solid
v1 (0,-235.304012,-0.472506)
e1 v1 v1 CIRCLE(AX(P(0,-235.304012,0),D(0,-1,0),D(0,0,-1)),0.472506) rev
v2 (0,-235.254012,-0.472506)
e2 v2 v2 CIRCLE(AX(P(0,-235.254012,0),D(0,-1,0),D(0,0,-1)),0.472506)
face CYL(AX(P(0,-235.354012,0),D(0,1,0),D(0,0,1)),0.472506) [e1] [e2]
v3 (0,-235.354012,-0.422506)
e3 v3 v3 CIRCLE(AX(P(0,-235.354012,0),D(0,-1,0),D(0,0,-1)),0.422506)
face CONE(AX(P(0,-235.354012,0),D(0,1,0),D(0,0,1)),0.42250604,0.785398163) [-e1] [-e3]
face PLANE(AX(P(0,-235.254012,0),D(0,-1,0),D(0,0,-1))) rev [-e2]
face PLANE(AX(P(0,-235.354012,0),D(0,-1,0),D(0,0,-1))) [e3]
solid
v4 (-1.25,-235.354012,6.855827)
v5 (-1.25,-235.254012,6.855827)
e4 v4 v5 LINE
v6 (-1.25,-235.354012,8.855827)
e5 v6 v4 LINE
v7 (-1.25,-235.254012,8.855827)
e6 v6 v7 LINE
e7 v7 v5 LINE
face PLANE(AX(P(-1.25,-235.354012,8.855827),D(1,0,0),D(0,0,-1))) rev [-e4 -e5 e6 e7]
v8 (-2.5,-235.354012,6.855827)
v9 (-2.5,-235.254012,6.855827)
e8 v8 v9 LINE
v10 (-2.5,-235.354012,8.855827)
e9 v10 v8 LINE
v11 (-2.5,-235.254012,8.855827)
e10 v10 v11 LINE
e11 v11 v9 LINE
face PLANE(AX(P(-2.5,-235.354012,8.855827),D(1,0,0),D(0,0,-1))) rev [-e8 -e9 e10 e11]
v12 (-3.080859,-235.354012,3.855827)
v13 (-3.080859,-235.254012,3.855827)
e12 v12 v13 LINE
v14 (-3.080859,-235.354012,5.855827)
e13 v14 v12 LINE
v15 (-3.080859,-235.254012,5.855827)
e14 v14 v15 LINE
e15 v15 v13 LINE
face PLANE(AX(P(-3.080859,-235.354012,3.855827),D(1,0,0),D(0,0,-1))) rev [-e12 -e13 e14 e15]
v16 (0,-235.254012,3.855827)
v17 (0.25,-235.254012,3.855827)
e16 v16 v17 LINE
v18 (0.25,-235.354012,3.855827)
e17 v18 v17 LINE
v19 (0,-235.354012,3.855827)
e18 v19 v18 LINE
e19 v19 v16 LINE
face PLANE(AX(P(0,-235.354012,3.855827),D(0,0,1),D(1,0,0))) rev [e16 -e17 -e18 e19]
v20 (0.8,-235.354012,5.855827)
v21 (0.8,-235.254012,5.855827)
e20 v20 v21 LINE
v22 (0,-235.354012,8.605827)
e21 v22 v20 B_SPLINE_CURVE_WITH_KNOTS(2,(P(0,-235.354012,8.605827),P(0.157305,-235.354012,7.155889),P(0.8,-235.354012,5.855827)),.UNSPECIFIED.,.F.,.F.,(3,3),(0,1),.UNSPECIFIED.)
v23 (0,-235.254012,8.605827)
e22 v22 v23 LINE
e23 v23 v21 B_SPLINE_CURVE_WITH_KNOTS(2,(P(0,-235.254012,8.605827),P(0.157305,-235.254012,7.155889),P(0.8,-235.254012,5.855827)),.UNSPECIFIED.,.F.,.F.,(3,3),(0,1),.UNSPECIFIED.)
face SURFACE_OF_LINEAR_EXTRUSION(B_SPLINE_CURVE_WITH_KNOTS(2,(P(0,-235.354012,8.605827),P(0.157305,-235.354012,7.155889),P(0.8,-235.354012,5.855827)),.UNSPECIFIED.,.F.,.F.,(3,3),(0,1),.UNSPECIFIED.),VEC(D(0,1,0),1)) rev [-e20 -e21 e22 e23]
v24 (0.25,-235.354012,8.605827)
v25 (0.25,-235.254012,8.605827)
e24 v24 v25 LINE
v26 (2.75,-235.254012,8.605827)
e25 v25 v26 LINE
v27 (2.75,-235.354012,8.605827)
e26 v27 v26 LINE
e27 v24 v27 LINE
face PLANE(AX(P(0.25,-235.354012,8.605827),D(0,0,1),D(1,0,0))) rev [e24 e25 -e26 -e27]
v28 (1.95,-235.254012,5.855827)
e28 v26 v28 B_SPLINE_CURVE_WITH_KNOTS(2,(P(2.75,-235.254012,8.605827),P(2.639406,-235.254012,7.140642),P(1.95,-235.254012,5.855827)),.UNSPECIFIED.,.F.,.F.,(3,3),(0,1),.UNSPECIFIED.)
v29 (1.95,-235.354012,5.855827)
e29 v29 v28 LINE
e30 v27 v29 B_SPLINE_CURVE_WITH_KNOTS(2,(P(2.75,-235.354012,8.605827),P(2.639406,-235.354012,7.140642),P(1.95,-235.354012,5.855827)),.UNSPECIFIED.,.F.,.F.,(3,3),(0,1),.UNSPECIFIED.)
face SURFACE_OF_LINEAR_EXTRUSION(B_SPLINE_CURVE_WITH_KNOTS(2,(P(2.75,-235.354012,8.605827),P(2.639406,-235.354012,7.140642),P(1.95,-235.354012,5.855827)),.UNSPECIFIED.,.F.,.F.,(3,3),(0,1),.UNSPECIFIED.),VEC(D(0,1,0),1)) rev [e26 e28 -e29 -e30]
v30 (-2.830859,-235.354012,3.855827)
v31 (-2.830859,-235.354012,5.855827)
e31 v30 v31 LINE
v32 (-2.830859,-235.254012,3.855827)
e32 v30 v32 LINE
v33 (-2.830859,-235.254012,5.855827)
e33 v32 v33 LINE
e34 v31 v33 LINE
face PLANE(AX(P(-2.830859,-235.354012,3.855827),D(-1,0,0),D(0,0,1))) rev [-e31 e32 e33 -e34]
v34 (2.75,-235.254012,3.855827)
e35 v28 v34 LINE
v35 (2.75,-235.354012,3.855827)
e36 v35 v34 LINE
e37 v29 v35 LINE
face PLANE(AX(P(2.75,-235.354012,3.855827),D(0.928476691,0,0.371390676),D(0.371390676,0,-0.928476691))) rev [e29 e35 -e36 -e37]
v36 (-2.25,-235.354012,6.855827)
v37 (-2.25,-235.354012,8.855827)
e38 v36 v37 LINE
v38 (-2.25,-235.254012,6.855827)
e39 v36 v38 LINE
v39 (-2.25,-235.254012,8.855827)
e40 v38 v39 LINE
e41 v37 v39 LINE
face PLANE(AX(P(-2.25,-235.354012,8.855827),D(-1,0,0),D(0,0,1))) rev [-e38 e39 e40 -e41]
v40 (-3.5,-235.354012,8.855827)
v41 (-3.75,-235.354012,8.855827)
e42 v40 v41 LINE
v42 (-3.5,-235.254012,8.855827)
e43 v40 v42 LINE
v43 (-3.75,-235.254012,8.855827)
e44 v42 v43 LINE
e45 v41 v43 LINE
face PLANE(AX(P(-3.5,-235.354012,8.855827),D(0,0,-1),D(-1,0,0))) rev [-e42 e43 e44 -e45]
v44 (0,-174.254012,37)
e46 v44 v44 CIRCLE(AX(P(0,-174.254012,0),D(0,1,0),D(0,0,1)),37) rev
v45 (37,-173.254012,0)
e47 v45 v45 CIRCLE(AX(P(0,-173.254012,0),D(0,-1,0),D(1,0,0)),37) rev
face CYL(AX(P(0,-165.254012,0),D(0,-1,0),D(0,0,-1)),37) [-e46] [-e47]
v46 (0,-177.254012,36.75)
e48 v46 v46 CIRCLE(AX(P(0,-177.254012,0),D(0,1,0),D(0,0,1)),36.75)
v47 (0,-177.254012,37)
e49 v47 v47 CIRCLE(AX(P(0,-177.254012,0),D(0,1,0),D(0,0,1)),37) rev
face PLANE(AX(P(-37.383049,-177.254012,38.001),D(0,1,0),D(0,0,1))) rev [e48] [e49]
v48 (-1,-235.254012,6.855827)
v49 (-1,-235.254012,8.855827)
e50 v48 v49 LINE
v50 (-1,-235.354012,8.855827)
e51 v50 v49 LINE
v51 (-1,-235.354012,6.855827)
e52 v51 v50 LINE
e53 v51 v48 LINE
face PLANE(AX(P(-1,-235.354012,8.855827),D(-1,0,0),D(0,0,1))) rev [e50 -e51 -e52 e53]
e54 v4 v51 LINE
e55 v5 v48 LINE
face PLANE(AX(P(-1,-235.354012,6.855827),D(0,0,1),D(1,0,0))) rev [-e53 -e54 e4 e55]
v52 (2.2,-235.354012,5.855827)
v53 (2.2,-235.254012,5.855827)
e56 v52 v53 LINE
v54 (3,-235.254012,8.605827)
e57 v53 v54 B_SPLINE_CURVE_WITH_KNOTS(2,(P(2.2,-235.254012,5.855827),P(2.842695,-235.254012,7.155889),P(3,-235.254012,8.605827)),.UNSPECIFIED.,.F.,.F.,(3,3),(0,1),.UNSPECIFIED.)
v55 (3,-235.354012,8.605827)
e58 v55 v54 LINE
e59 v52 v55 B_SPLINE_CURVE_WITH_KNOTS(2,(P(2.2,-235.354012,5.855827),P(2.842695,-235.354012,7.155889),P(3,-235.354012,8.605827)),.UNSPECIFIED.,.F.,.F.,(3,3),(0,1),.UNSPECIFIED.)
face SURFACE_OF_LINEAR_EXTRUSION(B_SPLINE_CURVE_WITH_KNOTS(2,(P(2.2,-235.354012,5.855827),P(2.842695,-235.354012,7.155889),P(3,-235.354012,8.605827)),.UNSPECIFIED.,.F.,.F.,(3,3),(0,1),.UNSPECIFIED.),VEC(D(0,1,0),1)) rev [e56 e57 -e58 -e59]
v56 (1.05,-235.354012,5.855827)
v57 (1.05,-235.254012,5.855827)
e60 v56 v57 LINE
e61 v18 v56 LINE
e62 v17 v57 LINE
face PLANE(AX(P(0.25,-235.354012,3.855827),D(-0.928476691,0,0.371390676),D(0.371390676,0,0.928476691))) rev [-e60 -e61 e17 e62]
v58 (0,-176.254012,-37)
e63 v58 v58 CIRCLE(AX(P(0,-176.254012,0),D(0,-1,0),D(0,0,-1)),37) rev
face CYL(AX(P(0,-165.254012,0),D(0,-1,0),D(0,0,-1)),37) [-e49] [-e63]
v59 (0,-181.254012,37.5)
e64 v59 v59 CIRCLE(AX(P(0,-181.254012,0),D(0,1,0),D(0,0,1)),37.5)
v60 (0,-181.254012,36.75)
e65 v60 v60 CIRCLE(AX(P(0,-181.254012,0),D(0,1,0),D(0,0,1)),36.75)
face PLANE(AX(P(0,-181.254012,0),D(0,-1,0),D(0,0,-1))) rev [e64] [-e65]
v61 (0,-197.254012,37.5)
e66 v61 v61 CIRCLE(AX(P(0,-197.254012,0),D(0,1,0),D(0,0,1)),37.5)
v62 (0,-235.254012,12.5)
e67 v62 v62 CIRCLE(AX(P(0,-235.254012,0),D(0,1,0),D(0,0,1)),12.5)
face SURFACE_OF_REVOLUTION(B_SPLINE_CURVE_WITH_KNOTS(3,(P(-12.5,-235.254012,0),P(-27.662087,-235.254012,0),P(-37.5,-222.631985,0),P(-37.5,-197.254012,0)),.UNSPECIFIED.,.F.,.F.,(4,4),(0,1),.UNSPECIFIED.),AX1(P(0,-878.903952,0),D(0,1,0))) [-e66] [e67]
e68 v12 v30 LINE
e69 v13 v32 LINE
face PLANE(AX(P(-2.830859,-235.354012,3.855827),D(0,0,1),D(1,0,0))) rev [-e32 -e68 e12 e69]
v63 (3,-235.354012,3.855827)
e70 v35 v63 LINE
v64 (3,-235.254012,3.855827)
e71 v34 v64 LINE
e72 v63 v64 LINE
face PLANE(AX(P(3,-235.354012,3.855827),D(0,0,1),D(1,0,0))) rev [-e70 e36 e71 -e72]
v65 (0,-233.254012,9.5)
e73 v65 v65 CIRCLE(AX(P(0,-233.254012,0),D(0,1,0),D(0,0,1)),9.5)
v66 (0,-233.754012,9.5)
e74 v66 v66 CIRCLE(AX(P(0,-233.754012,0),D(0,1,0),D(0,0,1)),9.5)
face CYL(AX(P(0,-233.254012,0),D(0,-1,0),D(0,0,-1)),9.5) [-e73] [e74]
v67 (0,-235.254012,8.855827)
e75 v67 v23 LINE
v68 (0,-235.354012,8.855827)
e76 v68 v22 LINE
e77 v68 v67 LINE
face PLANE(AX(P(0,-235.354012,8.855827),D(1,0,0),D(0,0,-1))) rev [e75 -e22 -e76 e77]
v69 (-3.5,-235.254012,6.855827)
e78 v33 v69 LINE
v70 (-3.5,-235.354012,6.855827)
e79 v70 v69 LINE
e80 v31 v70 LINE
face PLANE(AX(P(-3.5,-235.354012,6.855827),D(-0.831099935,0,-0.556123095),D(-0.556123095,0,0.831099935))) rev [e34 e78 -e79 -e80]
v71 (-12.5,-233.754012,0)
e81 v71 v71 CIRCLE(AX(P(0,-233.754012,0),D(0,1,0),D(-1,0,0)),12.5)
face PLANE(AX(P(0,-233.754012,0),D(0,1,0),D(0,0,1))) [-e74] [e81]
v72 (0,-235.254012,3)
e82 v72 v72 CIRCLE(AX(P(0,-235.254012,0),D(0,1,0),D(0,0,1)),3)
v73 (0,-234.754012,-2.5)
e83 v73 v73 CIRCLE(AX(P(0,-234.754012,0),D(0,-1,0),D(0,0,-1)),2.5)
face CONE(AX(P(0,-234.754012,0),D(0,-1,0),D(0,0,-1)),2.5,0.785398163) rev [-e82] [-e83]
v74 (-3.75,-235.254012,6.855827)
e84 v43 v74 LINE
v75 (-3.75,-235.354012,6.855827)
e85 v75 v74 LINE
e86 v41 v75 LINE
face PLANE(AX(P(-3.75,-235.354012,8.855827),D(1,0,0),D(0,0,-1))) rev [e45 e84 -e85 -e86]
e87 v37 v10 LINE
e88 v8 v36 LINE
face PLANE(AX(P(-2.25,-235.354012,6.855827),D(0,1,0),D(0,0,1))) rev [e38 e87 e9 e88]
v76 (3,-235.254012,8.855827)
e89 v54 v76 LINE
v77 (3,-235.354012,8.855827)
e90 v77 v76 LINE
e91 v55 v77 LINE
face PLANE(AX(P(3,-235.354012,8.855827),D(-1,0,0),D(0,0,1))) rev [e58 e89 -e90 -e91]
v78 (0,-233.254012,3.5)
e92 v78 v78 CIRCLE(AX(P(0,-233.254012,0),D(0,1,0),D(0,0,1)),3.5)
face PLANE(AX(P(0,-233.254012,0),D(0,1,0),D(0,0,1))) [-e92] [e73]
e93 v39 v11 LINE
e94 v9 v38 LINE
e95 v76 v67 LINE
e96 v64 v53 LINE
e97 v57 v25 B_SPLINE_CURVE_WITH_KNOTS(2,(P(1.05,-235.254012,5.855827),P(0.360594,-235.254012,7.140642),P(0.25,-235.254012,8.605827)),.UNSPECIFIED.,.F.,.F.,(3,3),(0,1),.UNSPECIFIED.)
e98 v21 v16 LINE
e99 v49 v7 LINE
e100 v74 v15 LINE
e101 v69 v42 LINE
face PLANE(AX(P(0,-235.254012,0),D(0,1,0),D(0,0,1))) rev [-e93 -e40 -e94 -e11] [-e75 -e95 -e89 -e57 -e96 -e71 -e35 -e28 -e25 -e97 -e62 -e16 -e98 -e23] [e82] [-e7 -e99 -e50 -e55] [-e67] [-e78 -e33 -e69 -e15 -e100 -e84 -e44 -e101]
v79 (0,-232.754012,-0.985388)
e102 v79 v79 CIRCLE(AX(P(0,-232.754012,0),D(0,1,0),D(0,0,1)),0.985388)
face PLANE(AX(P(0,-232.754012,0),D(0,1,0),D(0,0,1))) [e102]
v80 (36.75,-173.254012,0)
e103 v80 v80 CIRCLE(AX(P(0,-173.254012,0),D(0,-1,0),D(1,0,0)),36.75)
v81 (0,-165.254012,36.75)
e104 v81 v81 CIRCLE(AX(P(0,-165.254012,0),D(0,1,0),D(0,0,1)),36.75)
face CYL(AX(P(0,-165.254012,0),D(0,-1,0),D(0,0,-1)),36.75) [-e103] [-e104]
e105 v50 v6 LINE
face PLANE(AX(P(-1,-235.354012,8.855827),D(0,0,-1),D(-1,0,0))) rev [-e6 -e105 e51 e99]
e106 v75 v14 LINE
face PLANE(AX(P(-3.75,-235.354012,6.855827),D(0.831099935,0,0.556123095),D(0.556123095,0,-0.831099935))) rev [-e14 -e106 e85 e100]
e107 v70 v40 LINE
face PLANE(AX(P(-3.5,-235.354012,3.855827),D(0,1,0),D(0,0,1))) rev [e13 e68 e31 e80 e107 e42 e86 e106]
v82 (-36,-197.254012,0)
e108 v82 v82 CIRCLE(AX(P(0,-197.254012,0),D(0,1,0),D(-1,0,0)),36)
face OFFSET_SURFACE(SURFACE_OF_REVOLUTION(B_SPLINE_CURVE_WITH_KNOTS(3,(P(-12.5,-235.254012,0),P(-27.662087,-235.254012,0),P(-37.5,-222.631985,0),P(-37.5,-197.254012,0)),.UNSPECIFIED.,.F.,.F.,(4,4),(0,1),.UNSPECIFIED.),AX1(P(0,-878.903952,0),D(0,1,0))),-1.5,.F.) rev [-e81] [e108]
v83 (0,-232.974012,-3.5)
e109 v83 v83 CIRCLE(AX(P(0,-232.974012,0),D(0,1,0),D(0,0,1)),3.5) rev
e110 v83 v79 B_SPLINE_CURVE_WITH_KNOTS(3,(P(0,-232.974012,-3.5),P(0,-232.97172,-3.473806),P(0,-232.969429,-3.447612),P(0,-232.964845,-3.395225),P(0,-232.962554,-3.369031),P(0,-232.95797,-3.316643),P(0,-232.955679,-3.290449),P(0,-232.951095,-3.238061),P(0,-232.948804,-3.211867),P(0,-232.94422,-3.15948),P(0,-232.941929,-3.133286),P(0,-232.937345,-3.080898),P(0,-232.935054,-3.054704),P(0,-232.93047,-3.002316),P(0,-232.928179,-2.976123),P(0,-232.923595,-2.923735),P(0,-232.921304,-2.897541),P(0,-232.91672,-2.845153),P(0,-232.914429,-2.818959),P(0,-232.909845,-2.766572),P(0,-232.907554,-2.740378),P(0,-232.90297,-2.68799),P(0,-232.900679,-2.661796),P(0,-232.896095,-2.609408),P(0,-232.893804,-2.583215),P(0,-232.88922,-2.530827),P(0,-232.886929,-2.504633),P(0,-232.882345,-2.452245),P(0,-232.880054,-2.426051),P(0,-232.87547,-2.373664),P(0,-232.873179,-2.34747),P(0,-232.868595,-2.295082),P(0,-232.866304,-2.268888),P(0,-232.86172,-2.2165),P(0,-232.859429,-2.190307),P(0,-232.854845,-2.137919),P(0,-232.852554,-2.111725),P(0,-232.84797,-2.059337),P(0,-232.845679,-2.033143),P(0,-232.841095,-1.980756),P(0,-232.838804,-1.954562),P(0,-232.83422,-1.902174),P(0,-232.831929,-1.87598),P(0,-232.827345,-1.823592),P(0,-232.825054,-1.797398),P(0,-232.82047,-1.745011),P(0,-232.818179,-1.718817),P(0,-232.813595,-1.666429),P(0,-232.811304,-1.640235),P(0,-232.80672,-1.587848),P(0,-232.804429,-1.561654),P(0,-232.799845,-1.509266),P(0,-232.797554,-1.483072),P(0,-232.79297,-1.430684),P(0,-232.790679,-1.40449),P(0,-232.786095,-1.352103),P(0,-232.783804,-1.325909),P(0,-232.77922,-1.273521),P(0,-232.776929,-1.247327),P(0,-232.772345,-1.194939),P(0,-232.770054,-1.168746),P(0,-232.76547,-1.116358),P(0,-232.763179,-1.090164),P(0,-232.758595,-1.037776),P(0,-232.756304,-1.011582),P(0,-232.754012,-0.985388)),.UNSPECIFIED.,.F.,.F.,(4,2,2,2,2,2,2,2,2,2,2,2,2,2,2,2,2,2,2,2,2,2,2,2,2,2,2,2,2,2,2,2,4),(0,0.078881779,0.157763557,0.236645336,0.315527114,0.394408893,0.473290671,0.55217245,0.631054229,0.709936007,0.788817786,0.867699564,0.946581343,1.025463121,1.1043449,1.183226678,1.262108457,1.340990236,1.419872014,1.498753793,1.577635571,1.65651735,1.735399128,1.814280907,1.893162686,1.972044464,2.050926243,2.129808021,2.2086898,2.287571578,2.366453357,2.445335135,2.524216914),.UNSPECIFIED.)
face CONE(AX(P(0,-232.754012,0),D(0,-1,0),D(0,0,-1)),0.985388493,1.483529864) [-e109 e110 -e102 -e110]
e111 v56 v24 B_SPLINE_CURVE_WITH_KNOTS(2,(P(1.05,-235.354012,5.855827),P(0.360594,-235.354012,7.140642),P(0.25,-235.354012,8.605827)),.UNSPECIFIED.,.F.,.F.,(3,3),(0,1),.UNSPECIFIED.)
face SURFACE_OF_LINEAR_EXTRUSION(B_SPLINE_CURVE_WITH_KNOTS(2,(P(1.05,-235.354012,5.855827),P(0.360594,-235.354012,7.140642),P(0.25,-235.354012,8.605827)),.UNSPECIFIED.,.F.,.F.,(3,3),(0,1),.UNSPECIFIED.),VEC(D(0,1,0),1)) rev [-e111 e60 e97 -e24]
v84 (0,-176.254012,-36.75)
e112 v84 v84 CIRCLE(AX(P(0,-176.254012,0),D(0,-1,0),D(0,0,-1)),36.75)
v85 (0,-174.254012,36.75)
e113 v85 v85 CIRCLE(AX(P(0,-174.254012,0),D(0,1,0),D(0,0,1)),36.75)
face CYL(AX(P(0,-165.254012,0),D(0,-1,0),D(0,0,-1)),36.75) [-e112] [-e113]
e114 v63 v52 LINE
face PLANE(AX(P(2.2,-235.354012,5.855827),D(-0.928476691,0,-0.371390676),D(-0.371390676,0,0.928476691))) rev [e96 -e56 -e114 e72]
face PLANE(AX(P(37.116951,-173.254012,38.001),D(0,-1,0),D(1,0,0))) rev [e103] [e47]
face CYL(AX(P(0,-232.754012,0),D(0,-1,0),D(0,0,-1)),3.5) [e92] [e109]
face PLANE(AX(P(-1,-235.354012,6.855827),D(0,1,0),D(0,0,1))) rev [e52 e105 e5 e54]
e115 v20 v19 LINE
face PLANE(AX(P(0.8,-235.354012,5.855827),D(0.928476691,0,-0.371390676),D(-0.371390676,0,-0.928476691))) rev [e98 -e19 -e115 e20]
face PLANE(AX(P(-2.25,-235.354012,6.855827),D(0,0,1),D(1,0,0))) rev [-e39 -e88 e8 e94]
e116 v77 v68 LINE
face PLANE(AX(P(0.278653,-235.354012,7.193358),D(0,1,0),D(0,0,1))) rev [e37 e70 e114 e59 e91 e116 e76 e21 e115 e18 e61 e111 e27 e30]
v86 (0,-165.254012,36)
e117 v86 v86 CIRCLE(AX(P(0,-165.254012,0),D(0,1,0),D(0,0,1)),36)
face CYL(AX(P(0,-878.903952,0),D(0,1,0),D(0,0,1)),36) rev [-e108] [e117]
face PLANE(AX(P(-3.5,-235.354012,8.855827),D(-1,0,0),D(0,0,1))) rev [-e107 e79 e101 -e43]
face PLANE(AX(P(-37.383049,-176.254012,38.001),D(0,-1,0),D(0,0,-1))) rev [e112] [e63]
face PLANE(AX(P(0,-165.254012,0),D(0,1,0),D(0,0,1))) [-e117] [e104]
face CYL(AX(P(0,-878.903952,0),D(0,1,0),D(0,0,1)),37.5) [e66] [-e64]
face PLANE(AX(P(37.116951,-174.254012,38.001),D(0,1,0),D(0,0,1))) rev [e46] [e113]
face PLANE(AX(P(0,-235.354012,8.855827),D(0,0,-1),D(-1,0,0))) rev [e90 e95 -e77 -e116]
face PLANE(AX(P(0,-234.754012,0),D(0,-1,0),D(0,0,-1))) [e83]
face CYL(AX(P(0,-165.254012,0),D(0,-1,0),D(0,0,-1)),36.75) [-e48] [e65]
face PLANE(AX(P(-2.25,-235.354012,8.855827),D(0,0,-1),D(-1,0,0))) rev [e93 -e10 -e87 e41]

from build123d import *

# Parameters (mm, degrees)
THICKEN1_T1               = 1.5
SKETCH2_R                 = 36.75
SKETCH2_R_2               = 36
BOSS_EXTRUDE2_DEPTH       = 16
BOSS_EXTRUDE3_START       = -177.254011915
BOSS_EXTRUDE3_OUTLINE_R   = 37
BOSS_EXTRUDE3_DEPTH       = 1
BOSS_EXTRUDE3_START_2     = -174.254011915
BOSS_EXTRUDE3_2_OUTLINE_R = 37
BOSS_EXTRUDE3_2_DEPTH     = 1
SKETCH4_R                 = 36
CUT_EXTRUDE1_DEPTH        = 5
SKETCH5_R                 = 2.5
CUT_EXTRUDE2_DEPTH        = 0.5
CHAMFER1_SIZE             = 0.5
SKETCH7_W                 = 0.25
SKETCH7_H                 = 2
BOSS_EXTRUDE4_DEPTH       = 0.1
SKETCH8_R                 = 0.47250604
BOSS_EXTRUDE5_DEPTH       = 0.1
CHAMFER2_SIZE             = 0.05
SKETCH9_R                 = 9.5
BOSS_EXTRUDE6_DEPTH       = 0.5
SKETCH10_R                = 3.5
BOSS_EXTRUDE7_DEPTH       = 0.5
CHAMFER3_SIZE             = 0.22
CHAMFER3_SIZE2            = 2.514611507


# Read off the part's stored shape, not the designer's step: Boss-Extrude3
with BuildPart() as body_1:
    # Surface-Revolve1: a surface, the sketch's curves turned about an axis
    with BuildLine(Plane.XY, mode=Mode.PRIVATE) as surface_revolve1_1_path:
        Line((-37.5, -181.254011915), (-37.5, -197.254011915))
        add(Edge.make_bspline(
            [(-37.5, -197.254011915), (-37.5, -222.631985378), (-27.662087221, -235.254011915), (-12.5, -235.254011915)],
            knots=[0, 0, 0, 0, 1, 1, 1, 1], degree=3))
        Line((-12.5, -235.254011915), (0, -235.254011915))
    surface_revolve1_1 = Shell.revolve(surface_revolve1_1_path.wire(), 360, Axis((0, -878.903951825, 0), (0, 1, 0)))
    add(Solid.thicken(surface_revolve1_1, THICKEN1_T1))

    # Sketch2 → Boss-Extrude2 (add)
    with BuildSketch(Plane(origin=(0, -181.254011915, 0), x_dir=(1, 0, 0), z_dir=(0, 1, 0))):
        with Locations(Location((0, 0, 0), (0, 0, 270))):
            Circle(SKETCH2_R)
        with Locations(Location((0, 0, 0), (0, 0, 270))):
            Circle(SKETCH2_R_2, mode=Mode.SUBTRACT)
    extrude(amount=BOSS_EXTRUDE2_DEPTH)

    # Boss-Extrude3 outline → Boss-Extrude3 (add)
    with BuildSketch(Plane(origin=(0, 0, 0), x_dir=(1, 0, 0), z_dir=(0, 1, 0)).offset(BOSS_EXTRUDE3_START)):
        Circle(BOSS_EXTRUDE3_OUTLINE_R)
    extrude(amount=BOSS_EXTRUDE3_DEPTH)

    # Boss-Extrude3 2 outline → Boss-Extrude3 2 (add)
    with BuildSketch(Plane(origin=(0, 0, 0), x_dir=(1, 0, 0), z_dir=(0, 1, 0)).offset(BOSS_EXTRUDE3_START_2)):
        Circle(BOSS_EXTRUDE3_2_OUTLINE_R)
    extrude(amount=BOSS_EXTRUDE3_2_DEPTH)

    # Sketch4 → Cut-Extrude1 (cut)
    with BuildSketch(Plane(origin=(0, -173.254011915, 0), x_dir=(1, 0, 0), z_dir=(0, 1, 0))):
        with Locations(Location((0, 0, 0), (0, 0, 270))):
            Circle(SKETCH4_R)
    extrude(amount=-CUT_EXTRUDE1_DEPTH, mode=Mode.SUBTRACT)

    # Sketch5 → Cut-Extrude2 (cut)
    with BuildSketch(Plane.XZ.offset(235.254011915)):
        with Locations(Location((0, 0, 0), (0, 0, 270))):
            Circle(SKETCH5_R)
    extrude(amount=-CUT_EXTRUDE2_DEPTH, mode=Mode.SUBTRACT)

    # Chamfer1
    chamfer1_edges = [body_1.edges().sort_by_distance(p)[0] for p in [
        (0, -235.254011915, 2.5),
    ]]
    chamfer(chamfer1_edges, length=CHAMFER1_SIZE - 0.0001)  # a hair under: the kernel refuses the full size

    # Sketch7 → Boss-Extrude4 (add)
    with BuildSketch(Plane.XZ.offset(235.254011915)):
        Polygon((-3.75, 6.855827076), (-3.080858935, 5.855827076), (-3.080858935, 3.855827076), (-2.830858935, 3.855827076), (-2.830858935, 5.855827076), (-3.5, 6.855827076), (-3.5, 8.855827076), (-3.75, 8.855827076), align=None)
        with BuildLine():
            Line((0, 8.855827076), (3, 8.855827076))
            Line((3, 8.855827076), (3, 8.605827076))
            add(Edge.make_bspline(
                [(3, 8.605827076), (2.842694866, 7.155889233), (2.2, 5.855827076)],
                knots=[0, 0, 0, 1, 1, 1], degree=2))
            Line((2.2, 5.855827076), (3, 3.855827076))
            Line((3, 3.855827076), (2.75, 3.855827076))
            Line((2.75, 3.855827076), (1.95, 5.855827076))
            add(Edge.make_bspline(
                [(2.75, 8.605827076), (2.639405936, 7.140642131), (1.95, 5.855827076)],
                knots=[0, 0, 0, 1, 1, 1], degree=2))
            Line((2.75, 8.605827076), (0.25, 8.605827076))
            add(Edge.make_bspline(
                [(0.25, 8.605827076), (0.360594064, 7.140642131), (1.05, 5.855827076)],
                knots=[0, 0, 0, 1, 1, 1], degree=2))
            Line((1.05, 5.855827076), (0.25, 3.855827076))
            Line((0.25, 3.855827076), (0, 3.855827076))
            Line((0, 3.855827076), (0.8, 5.855827076))
            add(Edge.make_bspline(
                [(0, 8.605827076), (0.157305134, 7.155889233), (0.8, 5.855827076)],
                knots=[0, 0, 0, 1, 1, 1], degree=2))
            Line((0, 8.605827076), (0, 8.855827076))
        make_face()
        with Locations((-1.125, 7.855827076)):
            Rectangle(SKETCH7_W, SKETCH7_H)
        with Locations((-2.375, 7.855827076)):
            Rectangle(SKETCH7_W, SKETCH7_H)
    extrude(amount=BOSS_EXTRUDE4_DEPTH)

    # Sketch9 → Boss-Extrude6 (add)
    with BuildSketch(Plane(origin=(0, -233.754011915, 0), x_dir=(-1, 0, 0), z_dir=(0, 1, 0))):
        with Locations(Location((0, 0, 0), (0, 0, 90))):
            Circle(SKETCH9_R)
    extrude(amount=BOSS_EXTRUDE6_DEPTH)

    # Sketch10 → Boss-Extrude7 (add)
    with BuildSketch(Plane(origin=(0, -233.254011915, 0), x_dir=(1, 0, 0), z_dir=(0, 1, 0))):
        with Locations(Location((0, 0, 0), (0, 0, 270))):
            Circle(SKETCH10_R)
    extrude(amount=BOSS_EXTRUDE7_DEPTH)

    # Chamfer3
    chamfer3_edges = [body_1.edges().sort_by_distance(p)[0] for p in [
        (0, -232.754011915, -3.5),
    ]]
    chamfer3_side = [body_1.faces().sort_by_distance(p)[0] for p in [
        (0, -233.004011915, -3.5),
    ]]
    chamfer(chamfer3_edges, length=CHAMFER3_SIZE, length2=CHAMFER3_SIZE2, reference=chamfer3_side[0])


with BuildPart() as body_2:
    # Sketch8 → Boss-Extrude5 (new body)
    with BuildSketch(Plane.XZ.offset(235.254011915)):
        with Locations(Location((0, 0, 0), (0, 0, 270))):
            Circle(SKETCH8_R)
    extrude(amount=BOSS_EXTRUDE5_DEPTH)

    # Chamfer2
    chamfer2_edges = [body_2.edges().sort_by_distance(p)[0] for p in [
        (0, -235.354011915, 0.47250604),
    ]]
    chamfer(chamfer2_edges, length=CHAMFER2_SIZE)


solid = Compound([body_1.part, body_2.part])
